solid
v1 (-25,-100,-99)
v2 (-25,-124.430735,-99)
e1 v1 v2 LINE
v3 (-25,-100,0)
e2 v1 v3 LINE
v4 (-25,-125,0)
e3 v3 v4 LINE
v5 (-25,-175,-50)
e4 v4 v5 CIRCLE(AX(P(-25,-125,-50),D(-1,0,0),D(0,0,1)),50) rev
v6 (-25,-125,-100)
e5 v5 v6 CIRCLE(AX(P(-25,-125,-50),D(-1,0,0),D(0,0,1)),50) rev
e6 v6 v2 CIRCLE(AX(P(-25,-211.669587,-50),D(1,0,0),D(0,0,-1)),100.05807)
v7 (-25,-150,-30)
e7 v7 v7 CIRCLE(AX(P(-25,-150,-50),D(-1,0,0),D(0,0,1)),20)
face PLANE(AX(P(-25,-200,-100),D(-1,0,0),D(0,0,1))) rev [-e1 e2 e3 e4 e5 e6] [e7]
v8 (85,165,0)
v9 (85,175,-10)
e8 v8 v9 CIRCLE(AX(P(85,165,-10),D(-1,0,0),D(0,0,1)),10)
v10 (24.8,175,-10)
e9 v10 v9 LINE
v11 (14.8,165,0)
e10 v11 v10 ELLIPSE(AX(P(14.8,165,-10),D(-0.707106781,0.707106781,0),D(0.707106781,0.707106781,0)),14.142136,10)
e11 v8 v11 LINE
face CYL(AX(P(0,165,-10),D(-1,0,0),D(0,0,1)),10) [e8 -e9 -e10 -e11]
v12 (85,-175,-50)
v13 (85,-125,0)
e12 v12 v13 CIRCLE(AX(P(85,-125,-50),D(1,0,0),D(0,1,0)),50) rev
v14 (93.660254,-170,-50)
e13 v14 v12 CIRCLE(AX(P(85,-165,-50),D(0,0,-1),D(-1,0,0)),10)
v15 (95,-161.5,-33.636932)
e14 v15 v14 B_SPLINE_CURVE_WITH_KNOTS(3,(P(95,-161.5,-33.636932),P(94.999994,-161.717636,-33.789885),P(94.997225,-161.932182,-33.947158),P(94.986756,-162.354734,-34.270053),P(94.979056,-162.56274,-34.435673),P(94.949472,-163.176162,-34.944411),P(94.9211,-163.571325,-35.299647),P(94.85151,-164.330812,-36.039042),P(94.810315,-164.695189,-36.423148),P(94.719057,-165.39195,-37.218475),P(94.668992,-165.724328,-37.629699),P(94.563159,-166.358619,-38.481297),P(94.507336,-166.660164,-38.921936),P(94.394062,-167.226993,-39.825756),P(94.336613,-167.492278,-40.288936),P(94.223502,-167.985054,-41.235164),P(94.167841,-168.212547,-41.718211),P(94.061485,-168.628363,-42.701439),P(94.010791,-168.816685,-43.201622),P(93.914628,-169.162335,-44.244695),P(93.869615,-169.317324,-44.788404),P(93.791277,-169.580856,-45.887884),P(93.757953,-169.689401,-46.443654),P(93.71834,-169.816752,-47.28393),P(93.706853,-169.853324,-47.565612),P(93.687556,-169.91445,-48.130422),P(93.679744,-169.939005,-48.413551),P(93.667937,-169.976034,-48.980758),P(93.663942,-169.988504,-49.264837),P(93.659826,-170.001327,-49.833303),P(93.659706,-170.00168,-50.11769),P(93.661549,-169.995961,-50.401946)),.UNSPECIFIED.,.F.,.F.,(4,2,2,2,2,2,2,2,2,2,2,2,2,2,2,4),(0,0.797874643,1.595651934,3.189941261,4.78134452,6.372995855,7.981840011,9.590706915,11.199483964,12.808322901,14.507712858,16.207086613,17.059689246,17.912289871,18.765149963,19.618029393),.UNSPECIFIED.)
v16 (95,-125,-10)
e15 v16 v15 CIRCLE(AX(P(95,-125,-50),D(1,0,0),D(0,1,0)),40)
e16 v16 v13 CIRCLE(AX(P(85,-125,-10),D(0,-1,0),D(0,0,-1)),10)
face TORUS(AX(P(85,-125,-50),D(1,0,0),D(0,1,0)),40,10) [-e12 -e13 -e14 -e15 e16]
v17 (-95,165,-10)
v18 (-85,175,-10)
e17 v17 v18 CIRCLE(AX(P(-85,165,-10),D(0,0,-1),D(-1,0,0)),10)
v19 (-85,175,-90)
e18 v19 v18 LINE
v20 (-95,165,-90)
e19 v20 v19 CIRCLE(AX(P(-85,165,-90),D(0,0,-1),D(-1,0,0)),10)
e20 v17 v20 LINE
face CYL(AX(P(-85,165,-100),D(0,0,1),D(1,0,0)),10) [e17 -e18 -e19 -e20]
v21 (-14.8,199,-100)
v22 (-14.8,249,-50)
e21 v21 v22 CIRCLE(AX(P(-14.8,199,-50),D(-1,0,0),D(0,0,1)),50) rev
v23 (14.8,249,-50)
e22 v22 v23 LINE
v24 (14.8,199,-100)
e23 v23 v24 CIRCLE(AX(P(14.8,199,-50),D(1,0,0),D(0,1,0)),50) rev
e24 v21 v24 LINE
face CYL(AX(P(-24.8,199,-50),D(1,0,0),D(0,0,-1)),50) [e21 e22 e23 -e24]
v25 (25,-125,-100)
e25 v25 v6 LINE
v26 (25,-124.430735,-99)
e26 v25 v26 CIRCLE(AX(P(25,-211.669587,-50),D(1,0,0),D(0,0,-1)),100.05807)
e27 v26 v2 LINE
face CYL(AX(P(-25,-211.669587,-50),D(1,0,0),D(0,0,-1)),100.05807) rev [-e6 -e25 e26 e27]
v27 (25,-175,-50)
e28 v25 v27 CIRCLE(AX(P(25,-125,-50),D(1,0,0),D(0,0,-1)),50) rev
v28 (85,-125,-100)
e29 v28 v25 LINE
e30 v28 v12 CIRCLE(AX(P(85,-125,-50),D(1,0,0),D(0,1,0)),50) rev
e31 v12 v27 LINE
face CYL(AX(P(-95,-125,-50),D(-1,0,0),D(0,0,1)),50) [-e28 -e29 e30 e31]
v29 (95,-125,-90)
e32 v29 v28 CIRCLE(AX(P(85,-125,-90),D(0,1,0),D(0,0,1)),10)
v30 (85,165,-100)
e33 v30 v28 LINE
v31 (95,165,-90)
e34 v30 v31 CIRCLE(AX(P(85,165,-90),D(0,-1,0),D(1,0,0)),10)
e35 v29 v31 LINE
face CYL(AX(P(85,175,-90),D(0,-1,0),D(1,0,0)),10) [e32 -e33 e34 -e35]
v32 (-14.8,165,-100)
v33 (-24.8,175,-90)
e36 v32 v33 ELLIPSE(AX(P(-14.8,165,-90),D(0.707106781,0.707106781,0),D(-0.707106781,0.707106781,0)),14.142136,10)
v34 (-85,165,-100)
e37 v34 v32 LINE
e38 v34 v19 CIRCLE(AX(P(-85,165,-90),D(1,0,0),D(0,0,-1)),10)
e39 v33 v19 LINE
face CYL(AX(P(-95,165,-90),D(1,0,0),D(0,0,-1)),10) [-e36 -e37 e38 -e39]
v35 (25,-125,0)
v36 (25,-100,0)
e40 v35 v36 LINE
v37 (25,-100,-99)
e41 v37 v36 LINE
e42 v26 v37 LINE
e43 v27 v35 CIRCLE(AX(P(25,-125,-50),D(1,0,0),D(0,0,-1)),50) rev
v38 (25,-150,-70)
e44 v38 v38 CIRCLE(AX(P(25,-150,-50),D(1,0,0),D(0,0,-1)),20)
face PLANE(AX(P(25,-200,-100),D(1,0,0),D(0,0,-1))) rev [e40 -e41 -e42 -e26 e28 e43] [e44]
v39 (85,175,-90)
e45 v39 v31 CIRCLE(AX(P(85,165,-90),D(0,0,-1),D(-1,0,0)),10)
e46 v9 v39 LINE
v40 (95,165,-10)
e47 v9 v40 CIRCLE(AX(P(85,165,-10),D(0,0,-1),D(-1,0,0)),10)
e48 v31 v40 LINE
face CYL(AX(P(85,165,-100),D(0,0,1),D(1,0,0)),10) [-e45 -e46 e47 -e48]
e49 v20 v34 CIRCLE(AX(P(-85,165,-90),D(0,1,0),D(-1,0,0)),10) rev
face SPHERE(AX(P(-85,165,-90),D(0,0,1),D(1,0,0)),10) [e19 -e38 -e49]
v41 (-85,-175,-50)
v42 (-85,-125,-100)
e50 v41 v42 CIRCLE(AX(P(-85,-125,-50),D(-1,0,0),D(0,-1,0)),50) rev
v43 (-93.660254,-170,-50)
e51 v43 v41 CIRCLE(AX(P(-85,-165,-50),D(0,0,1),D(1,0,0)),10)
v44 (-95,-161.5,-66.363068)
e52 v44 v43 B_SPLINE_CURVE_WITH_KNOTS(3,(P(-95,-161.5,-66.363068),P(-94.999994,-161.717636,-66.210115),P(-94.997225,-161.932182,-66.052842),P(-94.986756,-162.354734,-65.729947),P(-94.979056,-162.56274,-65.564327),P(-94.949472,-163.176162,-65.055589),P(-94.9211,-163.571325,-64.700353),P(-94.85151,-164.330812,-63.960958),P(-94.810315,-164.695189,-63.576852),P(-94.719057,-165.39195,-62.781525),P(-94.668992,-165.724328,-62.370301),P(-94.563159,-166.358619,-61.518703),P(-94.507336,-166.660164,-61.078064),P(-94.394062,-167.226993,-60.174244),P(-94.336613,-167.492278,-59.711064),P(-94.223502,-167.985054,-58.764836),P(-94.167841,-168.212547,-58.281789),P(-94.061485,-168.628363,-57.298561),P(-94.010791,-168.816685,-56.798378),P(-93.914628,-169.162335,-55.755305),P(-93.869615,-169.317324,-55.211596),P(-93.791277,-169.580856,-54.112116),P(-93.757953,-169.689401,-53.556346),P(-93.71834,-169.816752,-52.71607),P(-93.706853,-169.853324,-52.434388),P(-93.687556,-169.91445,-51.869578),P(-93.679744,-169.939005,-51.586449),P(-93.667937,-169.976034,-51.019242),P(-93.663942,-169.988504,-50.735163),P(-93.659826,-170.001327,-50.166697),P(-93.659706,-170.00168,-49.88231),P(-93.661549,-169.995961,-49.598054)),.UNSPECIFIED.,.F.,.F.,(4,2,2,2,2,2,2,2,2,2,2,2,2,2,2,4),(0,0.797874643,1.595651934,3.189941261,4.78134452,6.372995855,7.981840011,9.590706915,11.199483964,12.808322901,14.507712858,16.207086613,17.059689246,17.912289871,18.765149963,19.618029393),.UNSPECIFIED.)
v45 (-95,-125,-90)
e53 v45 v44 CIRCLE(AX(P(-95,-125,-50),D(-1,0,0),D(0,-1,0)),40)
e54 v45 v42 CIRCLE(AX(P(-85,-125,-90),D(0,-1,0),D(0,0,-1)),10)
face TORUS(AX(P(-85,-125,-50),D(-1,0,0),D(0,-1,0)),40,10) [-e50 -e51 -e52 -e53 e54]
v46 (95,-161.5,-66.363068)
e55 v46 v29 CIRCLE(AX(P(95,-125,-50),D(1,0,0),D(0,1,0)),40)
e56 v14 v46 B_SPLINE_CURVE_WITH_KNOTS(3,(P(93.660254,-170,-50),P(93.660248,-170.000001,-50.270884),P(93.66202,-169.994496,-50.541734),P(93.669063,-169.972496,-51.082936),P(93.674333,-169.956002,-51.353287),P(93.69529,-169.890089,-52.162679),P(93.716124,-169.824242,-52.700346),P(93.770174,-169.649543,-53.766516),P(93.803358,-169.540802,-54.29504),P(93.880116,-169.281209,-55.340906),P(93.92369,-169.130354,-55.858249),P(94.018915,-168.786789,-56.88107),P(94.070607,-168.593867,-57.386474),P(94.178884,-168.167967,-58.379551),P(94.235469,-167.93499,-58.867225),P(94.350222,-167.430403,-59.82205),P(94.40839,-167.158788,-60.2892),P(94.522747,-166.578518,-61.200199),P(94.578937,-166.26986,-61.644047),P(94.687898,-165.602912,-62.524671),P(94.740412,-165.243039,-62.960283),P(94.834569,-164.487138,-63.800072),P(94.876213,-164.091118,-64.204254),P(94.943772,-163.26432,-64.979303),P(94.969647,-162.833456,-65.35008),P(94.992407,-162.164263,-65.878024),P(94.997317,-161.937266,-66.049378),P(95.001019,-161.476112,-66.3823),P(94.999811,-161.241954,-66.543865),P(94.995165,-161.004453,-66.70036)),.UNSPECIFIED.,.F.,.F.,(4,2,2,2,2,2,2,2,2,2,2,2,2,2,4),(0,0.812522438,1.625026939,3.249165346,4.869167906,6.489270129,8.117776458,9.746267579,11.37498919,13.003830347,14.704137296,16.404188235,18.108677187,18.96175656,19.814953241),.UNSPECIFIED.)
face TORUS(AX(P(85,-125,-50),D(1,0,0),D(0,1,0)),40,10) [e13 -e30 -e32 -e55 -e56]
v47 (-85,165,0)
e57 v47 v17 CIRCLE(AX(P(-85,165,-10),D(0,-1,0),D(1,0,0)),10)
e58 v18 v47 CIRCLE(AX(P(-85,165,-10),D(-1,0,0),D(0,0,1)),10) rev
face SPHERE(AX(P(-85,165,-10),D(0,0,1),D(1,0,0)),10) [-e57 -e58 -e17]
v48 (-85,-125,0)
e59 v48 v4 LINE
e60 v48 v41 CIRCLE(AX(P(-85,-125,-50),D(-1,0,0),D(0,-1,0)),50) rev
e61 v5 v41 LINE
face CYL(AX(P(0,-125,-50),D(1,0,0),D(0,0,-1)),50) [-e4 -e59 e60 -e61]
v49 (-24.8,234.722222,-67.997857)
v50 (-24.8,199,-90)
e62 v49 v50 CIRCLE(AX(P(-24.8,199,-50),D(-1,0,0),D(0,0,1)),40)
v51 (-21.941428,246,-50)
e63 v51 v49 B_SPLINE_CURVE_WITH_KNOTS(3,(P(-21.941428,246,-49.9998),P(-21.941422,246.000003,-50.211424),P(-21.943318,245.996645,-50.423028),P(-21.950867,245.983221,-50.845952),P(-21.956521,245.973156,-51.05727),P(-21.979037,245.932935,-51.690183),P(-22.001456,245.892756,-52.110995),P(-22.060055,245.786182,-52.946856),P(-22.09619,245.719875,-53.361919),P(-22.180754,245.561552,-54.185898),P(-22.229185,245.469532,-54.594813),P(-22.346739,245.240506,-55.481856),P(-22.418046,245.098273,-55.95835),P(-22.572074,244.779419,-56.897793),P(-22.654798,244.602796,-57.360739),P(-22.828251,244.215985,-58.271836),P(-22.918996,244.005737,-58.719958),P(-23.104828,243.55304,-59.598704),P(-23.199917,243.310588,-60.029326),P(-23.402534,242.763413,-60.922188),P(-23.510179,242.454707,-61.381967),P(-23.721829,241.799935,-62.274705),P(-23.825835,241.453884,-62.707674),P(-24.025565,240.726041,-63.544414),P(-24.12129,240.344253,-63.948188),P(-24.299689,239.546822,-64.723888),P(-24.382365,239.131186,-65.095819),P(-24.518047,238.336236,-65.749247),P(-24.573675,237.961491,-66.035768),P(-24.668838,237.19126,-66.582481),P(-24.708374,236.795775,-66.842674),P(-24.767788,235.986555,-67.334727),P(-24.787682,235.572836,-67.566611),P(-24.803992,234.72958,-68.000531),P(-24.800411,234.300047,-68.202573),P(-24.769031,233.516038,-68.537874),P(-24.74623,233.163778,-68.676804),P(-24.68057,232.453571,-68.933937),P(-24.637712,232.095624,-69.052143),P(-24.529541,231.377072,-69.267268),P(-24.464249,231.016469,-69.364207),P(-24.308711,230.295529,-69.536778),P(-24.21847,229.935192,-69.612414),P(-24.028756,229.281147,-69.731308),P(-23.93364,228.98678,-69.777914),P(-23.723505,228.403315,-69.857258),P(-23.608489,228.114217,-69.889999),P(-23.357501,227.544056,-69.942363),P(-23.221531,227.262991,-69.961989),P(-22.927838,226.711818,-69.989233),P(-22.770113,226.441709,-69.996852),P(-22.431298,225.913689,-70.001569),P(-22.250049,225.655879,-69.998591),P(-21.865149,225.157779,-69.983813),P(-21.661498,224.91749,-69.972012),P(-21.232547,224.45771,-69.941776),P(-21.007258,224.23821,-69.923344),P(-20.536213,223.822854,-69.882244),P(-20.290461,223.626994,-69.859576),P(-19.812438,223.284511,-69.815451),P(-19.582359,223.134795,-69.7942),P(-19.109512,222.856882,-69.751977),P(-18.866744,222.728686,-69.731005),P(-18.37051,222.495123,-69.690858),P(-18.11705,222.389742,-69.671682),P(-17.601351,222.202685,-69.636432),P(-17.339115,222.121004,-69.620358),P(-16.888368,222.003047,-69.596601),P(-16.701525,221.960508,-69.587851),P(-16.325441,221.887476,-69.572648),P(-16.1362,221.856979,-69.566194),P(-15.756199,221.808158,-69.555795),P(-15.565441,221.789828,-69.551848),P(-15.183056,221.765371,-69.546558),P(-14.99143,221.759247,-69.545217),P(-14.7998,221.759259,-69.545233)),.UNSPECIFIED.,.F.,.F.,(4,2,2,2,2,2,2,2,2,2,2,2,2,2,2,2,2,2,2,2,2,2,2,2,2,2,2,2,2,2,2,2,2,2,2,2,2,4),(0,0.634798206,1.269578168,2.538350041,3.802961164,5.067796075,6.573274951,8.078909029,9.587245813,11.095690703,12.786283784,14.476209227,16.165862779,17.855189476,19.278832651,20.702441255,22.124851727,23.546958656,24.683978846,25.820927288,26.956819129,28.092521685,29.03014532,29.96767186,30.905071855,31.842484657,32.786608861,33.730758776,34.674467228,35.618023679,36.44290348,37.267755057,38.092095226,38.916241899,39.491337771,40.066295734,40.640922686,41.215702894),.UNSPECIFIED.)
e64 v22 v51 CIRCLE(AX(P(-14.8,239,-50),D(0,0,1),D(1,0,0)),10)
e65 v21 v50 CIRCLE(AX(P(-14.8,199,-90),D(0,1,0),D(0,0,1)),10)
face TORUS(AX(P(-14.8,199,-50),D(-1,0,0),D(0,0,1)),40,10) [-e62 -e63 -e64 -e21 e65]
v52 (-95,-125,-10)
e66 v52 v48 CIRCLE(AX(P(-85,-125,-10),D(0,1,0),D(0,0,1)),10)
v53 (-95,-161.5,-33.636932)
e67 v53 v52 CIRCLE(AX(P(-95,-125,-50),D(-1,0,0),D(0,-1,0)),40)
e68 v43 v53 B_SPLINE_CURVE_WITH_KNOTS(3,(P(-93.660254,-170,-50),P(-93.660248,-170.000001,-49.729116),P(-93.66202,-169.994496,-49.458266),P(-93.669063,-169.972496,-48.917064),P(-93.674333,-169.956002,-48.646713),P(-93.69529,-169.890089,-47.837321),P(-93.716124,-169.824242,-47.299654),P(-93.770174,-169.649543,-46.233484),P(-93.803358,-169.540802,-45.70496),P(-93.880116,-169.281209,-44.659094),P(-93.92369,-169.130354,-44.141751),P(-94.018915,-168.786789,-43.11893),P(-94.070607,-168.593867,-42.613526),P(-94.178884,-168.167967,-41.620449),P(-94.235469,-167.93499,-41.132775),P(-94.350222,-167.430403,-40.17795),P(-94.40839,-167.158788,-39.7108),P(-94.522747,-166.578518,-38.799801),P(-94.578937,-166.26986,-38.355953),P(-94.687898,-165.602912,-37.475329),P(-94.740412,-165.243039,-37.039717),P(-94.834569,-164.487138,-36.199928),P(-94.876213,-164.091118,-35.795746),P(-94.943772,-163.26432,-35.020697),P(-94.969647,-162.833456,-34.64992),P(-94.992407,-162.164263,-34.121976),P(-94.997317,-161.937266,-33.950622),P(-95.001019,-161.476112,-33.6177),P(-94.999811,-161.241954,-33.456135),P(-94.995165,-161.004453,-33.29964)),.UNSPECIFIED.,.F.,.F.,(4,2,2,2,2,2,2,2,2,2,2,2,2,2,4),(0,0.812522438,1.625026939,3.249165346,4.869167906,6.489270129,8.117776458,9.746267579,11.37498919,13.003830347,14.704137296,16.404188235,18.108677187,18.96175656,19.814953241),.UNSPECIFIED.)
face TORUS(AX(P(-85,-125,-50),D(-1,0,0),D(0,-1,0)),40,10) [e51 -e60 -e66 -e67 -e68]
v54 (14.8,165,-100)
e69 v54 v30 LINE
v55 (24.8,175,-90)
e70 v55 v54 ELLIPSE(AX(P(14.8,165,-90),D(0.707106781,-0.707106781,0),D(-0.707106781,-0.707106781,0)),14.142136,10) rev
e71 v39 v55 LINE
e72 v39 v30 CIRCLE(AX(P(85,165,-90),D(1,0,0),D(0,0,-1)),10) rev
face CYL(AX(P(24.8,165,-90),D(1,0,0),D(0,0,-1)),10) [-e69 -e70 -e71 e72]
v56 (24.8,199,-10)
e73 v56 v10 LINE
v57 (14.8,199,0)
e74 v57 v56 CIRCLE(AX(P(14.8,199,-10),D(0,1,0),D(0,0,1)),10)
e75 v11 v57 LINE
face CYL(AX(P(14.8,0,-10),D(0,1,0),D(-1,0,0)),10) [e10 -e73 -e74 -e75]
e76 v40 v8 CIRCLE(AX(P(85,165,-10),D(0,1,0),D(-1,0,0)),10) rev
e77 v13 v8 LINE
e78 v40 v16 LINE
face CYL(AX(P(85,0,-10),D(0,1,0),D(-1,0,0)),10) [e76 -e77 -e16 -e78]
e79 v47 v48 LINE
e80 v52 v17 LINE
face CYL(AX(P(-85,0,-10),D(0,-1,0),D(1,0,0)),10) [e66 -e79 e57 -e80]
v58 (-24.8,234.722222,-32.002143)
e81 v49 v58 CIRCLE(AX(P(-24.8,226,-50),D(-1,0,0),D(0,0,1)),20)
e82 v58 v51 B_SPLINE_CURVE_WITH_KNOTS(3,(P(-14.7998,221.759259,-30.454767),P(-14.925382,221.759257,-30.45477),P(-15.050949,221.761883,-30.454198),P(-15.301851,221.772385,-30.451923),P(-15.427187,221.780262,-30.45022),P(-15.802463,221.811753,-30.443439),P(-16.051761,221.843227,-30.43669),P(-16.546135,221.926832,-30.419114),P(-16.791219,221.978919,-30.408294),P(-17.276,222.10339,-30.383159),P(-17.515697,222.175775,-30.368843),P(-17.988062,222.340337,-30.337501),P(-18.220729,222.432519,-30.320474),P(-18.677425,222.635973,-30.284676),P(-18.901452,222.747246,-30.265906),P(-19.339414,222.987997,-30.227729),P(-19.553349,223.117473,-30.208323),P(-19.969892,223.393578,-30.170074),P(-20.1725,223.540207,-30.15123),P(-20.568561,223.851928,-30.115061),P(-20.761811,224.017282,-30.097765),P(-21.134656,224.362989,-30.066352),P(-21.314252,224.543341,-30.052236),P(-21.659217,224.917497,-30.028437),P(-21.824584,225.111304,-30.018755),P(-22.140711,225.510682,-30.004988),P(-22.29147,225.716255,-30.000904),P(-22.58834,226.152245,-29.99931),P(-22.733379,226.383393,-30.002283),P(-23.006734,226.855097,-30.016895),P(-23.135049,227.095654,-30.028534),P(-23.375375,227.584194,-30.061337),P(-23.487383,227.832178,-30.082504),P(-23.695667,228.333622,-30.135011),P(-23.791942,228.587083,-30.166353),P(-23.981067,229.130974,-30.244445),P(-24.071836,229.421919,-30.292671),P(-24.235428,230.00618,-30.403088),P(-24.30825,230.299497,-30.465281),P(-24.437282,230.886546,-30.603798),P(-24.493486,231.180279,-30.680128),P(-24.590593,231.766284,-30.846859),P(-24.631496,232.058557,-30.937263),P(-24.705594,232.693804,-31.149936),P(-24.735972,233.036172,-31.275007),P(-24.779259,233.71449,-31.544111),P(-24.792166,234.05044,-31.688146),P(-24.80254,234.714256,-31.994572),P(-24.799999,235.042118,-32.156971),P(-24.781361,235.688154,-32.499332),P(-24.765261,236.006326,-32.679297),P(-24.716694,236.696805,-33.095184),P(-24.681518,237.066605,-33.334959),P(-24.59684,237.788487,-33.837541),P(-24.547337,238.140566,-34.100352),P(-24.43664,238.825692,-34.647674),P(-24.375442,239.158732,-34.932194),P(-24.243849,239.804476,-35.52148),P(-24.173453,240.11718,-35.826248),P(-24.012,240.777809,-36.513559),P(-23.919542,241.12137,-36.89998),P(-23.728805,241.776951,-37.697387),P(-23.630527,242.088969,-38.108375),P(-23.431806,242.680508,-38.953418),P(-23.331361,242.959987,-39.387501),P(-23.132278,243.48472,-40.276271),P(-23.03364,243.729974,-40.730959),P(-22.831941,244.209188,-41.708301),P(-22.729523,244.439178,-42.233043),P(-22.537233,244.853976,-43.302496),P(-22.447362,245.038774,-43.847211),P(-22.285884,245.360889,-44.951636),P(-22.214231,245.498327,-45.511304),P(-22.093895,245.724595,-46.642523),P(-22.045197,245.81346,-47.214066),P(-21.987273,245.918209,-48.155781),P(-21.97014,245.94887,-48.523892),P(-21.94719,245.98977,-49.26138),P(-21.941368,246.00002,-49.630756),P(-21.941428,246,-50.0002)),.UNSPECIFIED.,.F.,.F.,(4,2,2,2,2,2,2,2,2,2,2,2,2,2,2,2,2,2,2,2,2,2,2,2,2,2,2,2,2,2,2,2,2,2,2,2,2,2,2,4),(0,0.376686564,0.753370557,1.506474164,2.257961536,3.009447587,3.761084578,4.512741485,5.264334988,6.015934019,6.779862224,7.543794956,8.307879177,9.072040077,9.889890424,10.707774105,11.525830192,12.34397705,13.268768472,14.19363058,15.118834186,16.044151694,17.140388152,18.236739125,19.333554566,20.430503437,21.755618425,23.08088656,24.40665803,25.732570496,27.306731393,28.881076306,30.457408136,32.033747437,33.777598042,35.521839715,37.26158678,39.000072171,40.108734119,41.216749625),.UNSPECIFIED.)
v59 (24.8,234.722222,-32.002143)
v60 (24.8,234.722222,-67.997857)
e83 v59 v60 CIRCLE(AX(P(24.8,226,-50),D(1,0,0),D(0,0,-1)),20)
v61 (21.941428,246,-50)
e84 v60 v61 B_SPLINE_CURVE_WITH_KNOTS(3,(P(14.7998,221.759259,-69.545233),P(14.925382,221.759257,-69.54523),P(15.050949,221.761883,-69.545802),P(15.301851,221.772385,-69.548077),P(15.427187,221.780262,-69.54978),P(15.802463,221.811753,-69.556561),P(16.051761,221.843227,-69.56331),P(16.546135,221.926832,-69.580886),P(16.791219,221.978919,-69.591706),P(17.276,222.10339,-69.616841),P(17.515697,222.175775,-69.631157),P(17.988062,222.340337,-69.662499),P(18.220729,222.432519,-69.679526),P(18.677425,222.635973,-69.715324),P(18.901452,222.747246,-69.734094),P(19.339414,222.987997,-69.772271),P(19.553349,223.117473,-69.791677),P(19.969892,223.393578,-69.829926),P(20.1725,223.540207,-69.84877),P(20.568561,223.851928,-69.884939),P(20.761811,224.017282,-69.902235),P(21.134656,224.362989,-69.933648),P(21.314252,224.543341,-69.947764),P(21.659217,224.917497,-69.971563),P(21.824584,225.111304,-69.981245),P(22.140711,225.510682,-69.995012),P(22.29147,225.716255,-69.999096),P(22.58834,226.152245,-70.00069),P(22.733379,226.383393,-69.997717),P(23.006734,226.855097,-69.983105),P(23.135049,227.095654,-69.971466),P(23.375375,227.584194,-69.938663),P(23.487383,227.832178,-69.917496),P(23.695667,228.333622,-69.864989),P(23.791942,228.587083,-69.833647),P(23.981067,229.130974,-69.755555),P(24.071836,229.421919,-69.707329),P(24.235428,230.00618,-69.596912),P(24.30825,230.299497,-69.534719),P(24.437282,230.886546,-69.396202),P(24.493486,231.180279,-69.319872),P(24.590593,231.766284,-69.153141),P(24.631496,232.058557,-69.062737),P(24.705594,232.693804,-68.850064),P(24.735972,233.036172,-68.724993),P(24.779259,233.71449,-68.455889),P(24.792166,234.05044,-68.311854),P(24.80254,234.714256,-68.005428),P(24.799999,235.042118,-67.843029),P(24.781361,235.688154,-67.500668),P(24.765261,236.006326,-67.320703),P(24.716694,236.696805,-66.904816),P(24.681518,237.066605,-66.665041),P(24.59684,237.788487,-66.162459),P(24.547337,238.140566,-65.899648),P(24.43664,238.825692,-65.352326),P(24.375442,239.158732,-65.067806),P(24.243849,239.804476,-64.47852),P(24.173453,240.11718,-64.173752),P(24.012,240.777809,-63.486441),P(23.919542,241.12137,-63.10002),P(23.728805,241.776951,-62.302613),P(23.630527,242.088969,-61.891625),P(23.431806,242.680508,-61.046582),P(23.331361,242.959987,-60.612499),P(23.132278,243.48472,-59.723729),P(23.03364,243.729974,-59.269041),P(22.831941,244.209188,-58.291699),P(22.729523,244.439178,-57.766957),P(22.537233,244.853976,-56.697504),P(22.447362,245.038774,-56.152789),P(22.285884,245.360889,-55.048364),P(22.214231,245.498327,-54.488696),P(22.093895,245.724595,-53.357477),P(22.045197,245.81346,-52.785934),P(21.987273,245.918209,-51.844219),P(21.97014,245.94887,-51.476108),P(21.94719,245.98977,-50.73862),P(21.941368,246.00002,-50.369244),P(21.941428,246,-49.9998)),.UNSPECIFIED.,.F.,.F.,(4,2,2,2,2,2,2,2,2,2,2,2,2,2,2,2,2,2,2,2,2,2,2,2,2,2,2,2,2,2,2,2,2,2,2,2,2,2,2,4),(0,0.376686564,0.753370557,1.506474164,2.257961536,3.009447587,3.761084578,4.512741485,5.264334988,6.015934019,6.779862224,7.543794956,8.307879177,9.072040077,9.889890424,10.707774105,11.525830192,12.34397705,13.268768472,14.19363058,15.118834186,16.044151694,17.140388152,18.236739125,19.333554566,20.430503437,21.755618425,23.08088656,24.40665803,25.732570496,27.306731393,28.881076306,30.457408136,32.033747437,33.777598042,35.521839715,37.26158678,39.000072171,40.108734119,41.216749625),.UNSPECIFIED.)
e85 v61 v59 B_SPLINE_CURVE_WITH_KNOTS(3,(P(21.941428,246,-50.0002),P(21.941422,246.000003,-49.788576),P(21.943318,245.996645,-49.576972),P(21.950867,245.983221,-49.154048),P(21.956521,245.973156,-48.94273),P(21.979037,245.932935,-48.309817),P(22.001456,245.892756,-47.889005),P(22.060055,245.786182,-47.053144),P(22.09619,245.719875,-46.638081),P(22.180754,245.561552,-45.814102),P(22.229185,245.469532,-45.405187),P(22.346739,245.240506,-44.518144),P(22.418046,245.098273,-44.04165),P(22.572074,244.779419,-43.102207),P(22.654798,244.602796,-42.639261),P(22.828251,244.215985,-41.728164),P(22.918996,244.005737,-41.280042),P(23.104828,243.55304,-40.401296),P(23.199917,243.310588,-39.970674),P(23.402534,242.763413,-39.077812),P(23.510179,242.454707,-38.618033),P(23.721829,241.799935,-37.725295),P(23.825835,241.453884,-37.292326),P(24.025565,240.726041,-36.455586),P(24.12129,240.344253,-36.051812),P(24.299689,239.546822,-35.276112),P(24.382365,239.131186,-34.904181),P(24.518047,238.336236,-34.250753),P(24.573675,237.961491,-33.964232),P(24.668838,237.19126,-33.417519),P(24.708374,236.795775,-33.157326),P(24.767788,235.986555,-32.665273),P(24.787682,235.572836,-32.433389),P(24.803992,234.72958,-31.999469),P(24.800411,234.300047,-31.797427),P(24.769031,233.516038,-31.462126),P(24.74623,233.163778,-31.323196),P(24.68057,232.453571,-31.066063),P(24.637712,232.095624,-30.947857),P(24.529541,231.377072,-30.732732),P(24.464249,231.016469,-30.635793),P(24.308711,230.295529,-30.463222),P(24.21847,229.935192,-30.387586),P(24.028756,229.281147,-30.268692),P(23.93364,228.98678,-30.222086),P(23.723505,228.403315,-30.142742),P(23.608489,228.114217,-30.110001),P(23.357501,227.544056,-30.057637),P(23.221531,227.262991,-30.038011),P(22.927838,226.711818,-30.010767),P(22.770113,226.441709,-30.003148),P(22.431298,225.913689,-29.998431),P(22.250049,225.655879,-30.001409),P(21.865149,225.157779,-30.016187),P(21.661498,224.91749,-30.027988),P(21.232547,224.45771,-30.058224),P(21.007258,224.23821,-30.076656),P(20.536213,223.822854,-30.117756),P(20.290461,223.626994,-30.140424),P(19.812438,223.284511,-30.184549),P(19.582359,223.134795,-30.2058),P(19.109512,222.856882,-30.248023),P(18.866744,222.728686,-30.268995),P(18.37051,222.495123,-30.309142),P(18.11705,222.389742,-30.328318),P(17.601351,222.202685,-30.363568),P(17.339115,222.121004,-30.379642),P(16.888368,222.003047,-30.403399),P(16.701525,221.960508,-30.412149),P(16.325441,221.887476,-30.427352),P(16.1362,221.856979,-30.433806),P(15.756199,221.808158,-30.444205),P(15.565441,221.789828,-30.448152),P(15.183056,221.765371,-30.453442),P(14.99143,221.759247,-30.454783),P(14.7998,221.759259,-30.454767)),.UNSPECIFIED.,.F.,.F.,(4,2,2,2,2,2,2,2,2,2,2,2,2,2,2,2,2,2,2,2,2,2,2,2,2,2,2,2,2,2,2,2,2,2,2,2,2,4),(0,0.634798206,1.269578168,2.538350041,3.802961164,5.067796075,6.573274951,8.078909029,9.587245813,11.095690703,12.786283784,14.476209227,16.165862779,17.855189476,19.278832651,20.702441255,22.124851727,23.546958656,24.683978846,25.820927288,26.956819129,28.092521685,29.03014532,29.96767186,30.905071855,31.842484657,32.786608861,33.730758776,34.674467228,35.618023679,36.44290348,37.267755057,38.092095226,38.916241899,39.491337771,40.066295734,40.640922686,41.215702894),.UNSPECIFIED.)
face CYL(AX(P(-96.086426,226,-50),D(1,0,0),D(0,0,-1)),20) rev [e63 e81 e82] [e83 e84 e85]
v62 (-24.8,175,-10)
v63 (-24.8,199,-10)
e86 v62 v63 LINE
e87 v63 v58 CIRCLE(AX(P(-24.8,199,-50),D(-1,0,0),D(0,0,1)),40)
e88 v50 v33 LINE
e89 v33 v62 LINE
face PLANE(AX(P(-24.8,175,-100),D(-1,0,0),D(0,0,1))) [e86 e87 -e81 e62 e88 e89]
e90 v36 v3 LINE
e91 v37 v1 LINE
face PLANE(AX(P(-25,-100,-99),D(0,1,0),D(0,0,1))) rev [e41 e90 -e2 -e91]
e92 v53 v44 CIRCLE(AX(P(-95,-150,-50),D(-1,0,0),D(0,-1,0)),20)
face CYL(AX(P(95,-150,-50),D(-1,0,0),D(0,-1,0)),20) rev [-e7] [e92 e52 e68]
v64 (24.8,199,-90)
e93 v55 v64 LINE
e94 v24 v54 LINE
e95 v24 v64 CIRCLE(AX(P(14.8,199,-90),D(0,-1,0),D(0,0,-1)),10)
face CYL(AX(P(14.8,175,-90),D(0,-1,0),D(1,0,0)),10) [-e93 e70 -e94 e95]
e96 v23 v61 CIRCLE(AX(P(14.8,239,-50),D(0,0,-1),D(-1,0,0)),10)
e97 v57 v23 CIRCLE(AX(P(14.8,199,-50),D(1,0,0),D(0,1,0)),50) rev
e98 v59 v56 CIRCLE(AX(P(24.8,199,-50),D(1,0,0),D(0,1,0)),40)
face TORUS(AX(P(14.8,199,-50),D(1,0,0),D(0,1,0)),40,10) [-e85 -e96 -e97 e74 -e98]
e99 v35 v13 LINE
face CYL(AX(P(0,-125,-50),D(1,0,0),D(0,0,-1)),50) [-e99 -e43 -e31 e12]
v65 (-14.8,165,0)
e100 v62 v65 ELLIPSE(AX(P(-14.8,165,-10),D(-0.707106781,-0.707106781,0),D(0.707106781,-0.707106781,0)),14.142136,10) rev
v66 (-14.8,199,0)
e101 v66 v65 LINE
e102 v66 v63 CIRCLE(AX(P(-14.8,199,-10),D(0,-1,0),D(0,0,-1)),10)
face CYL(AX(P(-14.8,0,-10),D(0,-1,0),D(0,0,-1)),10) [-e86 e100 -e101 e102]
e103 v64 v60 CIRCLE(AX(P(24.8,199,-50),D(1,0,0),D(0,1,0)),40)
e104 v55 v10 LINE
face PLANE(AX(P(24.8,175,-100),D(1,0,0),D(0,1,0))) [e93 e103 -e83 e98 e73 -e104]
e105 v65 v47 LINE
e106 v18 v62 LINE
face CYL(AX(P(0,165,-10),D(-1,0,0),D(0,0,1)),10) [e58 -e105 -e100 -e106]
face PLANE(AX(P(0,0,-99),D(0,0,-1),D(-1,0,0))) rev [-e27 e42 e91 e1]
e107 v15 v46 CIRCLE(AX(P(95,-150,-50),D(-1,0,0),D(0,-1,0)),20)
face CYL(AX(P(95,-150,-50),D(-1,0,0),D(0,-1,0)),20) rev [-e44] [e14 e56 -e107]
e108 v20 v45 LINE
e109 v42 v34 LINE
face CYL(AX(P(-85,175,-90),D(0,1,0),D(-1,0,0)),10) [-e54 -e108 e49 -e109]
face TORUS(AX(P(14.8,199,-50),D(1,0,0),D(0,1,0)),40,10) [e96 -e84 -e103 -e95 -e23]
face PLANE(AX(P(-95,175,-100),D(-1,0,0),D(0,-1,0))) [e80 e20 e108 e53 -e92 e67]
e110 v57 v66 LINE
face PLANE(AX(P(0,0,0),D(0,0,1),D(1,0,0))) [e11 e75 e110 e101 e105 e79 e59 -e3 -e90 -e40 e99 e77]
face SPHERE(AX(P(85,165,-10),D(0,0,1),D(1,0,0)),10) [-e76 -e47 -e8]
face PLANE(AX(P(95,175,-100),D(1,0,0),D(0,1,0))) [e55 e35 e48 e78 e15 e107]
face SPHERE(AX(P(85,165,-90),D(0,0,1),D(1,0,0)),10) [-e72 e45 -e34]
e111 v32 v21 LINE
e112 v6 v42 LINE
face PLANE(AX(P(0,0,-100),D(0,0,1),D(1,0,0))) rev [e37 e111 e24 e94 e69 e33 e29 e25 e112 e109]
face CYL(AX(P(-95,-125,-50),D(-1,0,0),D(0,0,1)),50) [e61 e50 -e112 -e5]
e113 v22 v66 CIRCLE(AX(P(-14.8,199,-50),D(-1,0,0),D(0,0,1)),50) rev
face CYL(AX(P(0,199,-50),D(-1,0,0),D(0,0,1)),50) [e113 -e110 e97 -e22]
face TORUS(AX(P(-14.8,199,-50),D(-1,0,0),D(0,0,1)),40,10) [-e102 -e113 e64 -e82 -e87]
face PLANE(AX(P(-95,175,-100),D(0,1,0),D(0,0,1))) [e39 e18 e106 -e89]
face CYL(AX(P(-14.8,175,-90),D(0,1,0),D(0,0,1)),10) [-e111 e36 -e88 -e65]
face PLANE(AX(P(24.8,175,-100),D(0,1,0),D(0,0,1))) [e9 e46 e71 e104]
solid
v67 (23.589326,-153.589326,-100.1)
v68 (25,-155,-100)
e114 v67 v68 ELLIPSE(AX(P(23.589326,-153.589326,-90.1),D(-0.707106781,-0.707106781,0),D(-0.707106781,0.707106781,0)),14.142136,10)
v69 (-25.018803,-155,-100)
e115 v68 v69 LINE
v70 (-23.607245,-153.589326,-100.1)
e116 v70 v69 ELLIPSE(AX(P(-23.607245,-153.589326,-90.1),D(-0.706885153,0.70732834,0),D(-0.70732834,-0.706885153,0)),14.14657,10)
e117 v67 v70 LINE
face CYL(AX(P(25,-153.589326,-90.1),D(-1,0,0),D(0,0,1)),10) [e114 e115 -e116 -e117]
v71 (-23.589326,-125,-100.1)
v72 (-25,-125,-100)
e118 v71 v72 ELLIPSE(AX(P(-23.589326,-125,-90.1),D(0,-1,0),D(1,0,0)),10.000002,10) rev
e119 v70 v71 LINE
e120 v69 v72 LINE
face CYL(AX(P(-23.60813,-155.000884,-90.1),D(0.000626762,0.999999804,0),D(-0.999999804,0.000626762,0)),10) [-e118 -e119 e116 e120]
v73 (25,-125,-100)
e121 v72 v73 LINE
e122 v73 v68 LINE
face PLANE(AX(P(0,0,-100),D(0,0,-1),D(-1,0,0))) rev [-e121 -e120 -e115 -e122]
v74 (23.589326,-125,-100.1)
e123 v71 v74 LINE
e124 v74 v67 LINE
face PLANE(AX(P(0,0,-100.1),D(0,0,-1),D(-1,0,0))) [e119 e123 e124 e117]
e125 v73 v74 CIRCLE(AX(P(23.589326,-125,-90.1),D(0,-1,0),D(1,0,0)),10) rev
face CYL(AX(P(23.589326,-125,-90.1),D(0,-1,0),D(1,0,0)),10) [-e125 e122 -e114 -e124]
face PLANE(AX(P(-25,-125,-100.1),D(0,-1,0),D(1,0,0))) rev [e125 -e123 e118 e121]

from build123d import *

# Parameters (mm, degrees)
BOSS_EXTRUDE1_DEPTH = 100
SKETCH2_W           = 50
SKETCH2_H           = 50
CUT_EXTRUDE1_DEPTH  = 285.650663094
FILLET1_R           = 50
CUT_EXTRUDE2_DEPTH  = 25
SKETCH7_R           = 20
CUT_EXTRUDE3_DEPTH  = 329.7871652
FILLET2_R           = 50
SKETCH9_W           = 50
SKETCH9_H           = 12.5
CUT_EXTRUDE6_DEPTH  = 285.650663094
CUT_EXTRUDE7_DEPTH  = 25
FILLET3_R           = 10
SKETCH11_W          = 50
SKETCH11_H          = 25
CUT_EXTRUDE8_DEPTH  = 99
BOSS_EXTRUDE7_DEPTH = 0.1
FILLET4_R           = 10
FILLET5_R           = 10
SKETCH14_R          = 20
CUT_EXTRUDE9_DEPTH  = 294.892922803


# Some blends are built 0.0001 mm under size
with BuildPart() as part:
    # Sketch1 → Boss-Extrude1 (new body)
    with BuildSketch(Plane.XY):
        Polygon((-24.8, 175), (-24.8, 249), (24.8, 249), (24.8, 175), (95, 175), (95, -175), (-95, -175), (-95, 175), align=None)
    extrude(amount=-BOSS_EXTRUDE1_DEPTH)

    # Sketch2 → Cut-Extrude1 (cut, through all)
    with BuildSketch(Plane.XY):
        with Locations((0, -175)):
            Rectangle(SKETCH2_W, SKETCH2_H)
    extrude(amount=-CUT_EXTRUDE1_DEPTH, mode=Mode.SUBTRACT)

    # Fillet1
    fillet1_edges = [part.edges().sort_by_distance(p)[0] for p in [
        (0, 249, -100),
        (0, 249, 0),
    ]]
    fillet(fillet1_edges, radius=FILLET1_R - 0.0001)  # a hair under: the kernel refuses the full size

    # Sketch6 → Cut-Extrude2 (cut, symmetric)
    with BuildSketch(Plane(origin=(0, 0, 0), x_dir=(0, 0, -1), z_dir=(1, 0, 0))):
        with BuildLine():
            Line((100, -150), (0, -150))
            ThreePointArc((0, -150), (50, -100), (100, -150))
        make_face()
    extrude(amount=CUT_EXTRUDE2_DEPTH, both=True, mode=Mode.SUBTRACT)

    # Sketch7 → Cut-Extrude3 (cut, through all)
    with BuildSketch(Plane.ZY.offset(95)):
        with Locations(Location((-50, -150, 0), (0, 0, 270))):
            Circle(SKETCH7_R)
    extrude(amount=-CUT_EXTRUDE3_DEPTH, mode=Mode.SUBTRACT)

    # Fillet2
    # the kernel refuses this fillet: 50 mm, written as the material it takes off along each edge
    with BuildSketch(Plane(origin=(100, -175, -100), x_dir=(0, 1, 0), z_dir=(-1, 0, 0))) as fillet2_piece_1:
        with BuildLine():
            CenterArc((FILLET2_R, -FILLET2_R), FILLET2_R, 90, 90)
            Line((0, -FILLET2_R), (0, 0))
            Line((0, 0), (FILLET2_R, 0))
        make_face()
    extrude(amount=320, mode=Mode.SUBTRACT)
    with BuildSketch(Plane(origin=(100, -175, 0), x_dir=(0, 1, 0), z_dir=(-1, 0, 0))) as fillet2_piece_2:
        with BuildLine():
            CenterArc((FILLET2_R, FILLET2_R), FILLET2_R, 180, 90)
            Line((0, FILLET2_R), (0, 0))
            Line((0, 0), (FILLET2_R, 0))
        make_face()
    extrude(amount=320, mode=Mode.SUBTRACT)

    # Sketch9 → Cut-Extrude6 (cut, through all)
    with BuildSketch(Plane.XY):
        with Locations((0, -131.25)):
            Rectangle(SKETCH9_W, SKETCH9_H)
    extrude(amount=-CUT_EXTRUDE6_DEPTH, mode=Mode.SUBTRACT)

    # Sketch10 → Cut-Extrude7 (cut, symmetric)
    with BuildSketch(Plane(origin=(0, 0, 0), x_dir=(0, 0, -1), z_dir=(1, 0, 0))):
        with BuildLine():
            Line((0, -125), (100, -125))
            ThreePointArc((100, -125), (50, -111.611517322), (0, -125))
        make_face()
    extrude(amount=CUT_EXTRUDE7_DEPTH, both=True, mode=Mode.SUBTRACT)

    # Fillet3
    # the kernel refuses this fillet: 10 mm, written as the material it takes off along each edge
    with BuildSketch(Plane(origin=(24.8, 199.0001, -100), x_dir=(-1, 0, 0), z_dir=(0, -1, 0)), Plane(origin=(-24.8, 175, 0), x_dir=(0, 0, -1), z_dir=(0, 1, 0))) as fillet3_piece_1:
        with BuildLine():
            CenterArc((FILLET3_R, -FILLET3_R), FILLET3_R, 90, 90)
            Line((0, -FILLET3_R), (0, 0))
            Line((0, 0), (FILLET3_R, 0))
        make_face()
    extrude(amount=24.0001, mode=Mode.SUBTRACT)
    with BuildSketch(Plane(origin=(24.8, 175, 0), x_dir=(0, -1, 0), z_dir=(1, 0, 0)), Plane(origin=(-120, 175, 0), x_dir=(0, -1, 0), z_dir=(1, 0, 0))) as fillet3_piece_2:
        with BuildLine():
            CenterArc((FILLET3_R, FILLET3_R), FILLET3_R, 180, 90)
            Line((0, FILLET3_R), (0, 0))
            Line((0, 0), (FILLET3_R, 0))
        make_face()
    extrude(amount=95.2, mode=Mode.SUBTRACT)
    with BuildSketch(Plane(origin=(-120, 175, -100), x_dir=(0, -1, 0), z_dir=(1, 0, 0)), Plane(origin=(24.8, 175, -100), x_dir=(0, -1, 0), z_dir=(1, 0, 0))) as fillet3_piece_3:
        with BuildLine():
            CenterArc((FILLET3_R, -FILLET3_R), FILLET3_R, 90, 90)
            Line((0, -FILLET3_R), (0, 0))
            Line((0, 0), (FILLET3_R, 0))
        make_face()
    extrude(amount=95.2, mode=Mode.SUBTRACT)
    with BuildSketch(Plane(origin=(-95, -125, -100), x_dir=(1, 0, 0), z_dir=(0, 1, 0)), Plane(origin=(95, 200, -100), x_dir=(-1, 0, 0), z_dir=(0, -1, 0))) as fillet3_piece_4:
        with BuildLine():
            CenterArc((FILLET3_R, -FILLET3_R), FILLET3_R, 90, 90)
            Line((0, -FILLET3_R), (0, 0))
            Line((0, 0), (FILLET3_R, 0))
        make_face()
    extrude(amount=325, mode=Mode.SUBTRACT)
    with BuildSketch(Plane(origin=(-24.8, 175, -100), x_dir=(0, 0, 1), z_dir=(0, 1, 0)), Plane(origin=(24.8, 199.0001, 0), x_dir=(-1, 0, 0), z_dir=(0, -1, 0))) as fillet3_piece_5:
        with BuildLine():
            CenterArc((FILLET3_R, FILLET3_R), FILLET3_R, 180, 90)
            Line((0, FILLET3_R), (0, 0))
            Line((0, 0), (FILLET3_R, 0))
        make_face()
    extrude(amount=24.0001, mode=Mode.SUBTRACT)
    with BuildSketch(Plane(origin=(-24.8, 199.0001, -49.9999), x_dir=(0, 1, 0), z_dir=(0, 0, -1))) as fillet3_piece_6:
        with BuildLine():
            CenterArc((49.9999 - FILLET3_R, FILLET3_R), FILLET3_R, 270, 90)
            Line((49.9999, FILLET3_R), (49.9999, 0))
            Line((49.9999, 0), (49.9999 - FILLET3_R, 0))
        make_face()
    revolve(axis=Axis((-24.8, 199.0001, -49.9999), (1, 0, 0)), revolution_arc=90, mode=Mode.SUBTRACT)
    with BuildSketch(Plane(origin=(-24.8, 199.0001, -50.0001), x_dir=(0, 1, 0), z_dir=(0, 0, 1))) as fillet3_piece_7:
        with BuildLine():
            CenterArc((49.9999 - FILLET3_R, -FILLET3_R), FILLET3_R, 0, 90)
            Line((49.9999, -FILLET3_R), (49.9999, 0))
            Line((49.9999, 0), (49.9999 - FILLET3_R, 0))
        make_face()
    revolve(axis=Axis((-24.8, 199.0001, -50.0001), (-1, 0, 0)), revolution_arc=90, mode=Mode.SUBTRACT)
    with BuildSketch(Plane(origin=(24.8, 199.0001, -49.9999), x_dir=(0, 1, 0), z_dir=(0, 0, -1))) as fillet3_piece_8:
        with BuildLine():
            CenterArc((49.9999 - FILLET3_R, -FILLET3_R), FILLET3_R, 0, 90)
            Line((49.9999 - FILLET3_R, 0), (49.9999, 0))
            Line((49.9999, 0), (49.9999, -FILLET3_R))
        make_face()
    revolve(axis=Axis((24.8, 199.0001, -49.9999), (1, 0, 0)), revolution_arc=90, mode=Mode.SUBTRACT)
    with BuildSketch(Plane(origin=(24.8, 199.0001, -50.0001), x_dir=(0, 1, 0), z_dir=(0, 0, 1))) as fillet3_piece_9:
        with BuildLine():
            CenterArc((49.9999 - FILLET3_R, FILLET3_R), FILLET3_R, 270, 90)
            Line((49.9999 - FILLET3_R, 0), (49.9999, 0))
            Line((49.9999, 0), (49.9999, FILLET3_R))
        make_face()
    revolve(axis=Axis((24.8, 199.0001, -50.0001), (-1, 0, 0)), revolution_arc=90, mode=Mode.SUBTRACT)
    with BuildSketch(Plane(origin=(95, 200, 0), x_dir=(-1, 0, 0), z_dir=(0, -1, 0)), Plane(origin=(-95, -125, 0), x_dir=(1, 0, 0), z_dir=(0, 1, 0))) as fillet3_piece_10:
        with BuildLine():
            CenterArc((FILLET3_R, FILLET3_R), FILLET3_R, 180, 90)
            Line((0, FILLET3_R), (0, 0))
            Line((0, 0), (FILLET3_R, 0))
        make_face()
    extrude(amount=325, mode=Mode.SUBTRACT)
    with BuildSketch(Plane(origin=(95, -125, -50), x_dir=(0, 0, -1), z_dir=(0, 1, 0))) as fillet3_piece_11:
        with BuildLine():
            CenterArc((50 - FILLET3_R, FILLET3_R), FILLET3_R, 270, 90)
            Line((50 - FILLET3_R, 0), (50, 0))
            Line((50, 0), (50, FILLET3_R))
        make_face()
    revolve(axis=Axis((95, -125, -50), (-1, 0, 0)), revolution_arc=180, mode=Mode.SUBTRACT)
    with BuildSketch(Plane(origin=(-95, -125, -50), x_dir=(0, 0, -1), z_dir=(0, 1, 0))) as fillet3_piece_12:
        with BuildLine():
            CenterArc((50 - FILLET3_R, -FILLET3_R), FILLET3_R, 0, 90)
            Line((50, -FILLET3_R), (50, 0))
            Line((50, 0), (50 - FILLET3_R, 0))
        make_face()
    revolve(axis=Axis((-95, -125, -50), (-1, 0, 0)), revolution_arc=180, mode=Mode.SUBTRACT)
    with BuildSketch(Plane(origin=(24.8, 249, -49.9999), x_dir=(-1, 0, 0), z_dir=(0, 0, -1)), Plane(origin=(-24.8, 249, -49.9999), x_dir=(0, -1, 0), z_dir=(0, 0, -1))) as fillet3_piece_13:
        with BuildLine():
            CenterArc((FILLET3_R, -FILLET3_R), FILLET3_R, 90, 90)
            Line((0, -FILLET3_R), (0, 0))
            Line((0, 0), (FILLET3_R, 0))
        make_face()
    extrude(amount=0.0002, mode=Mode.SUBTRACT)
    with BuildSketch(Plane(origin=(-0.2, 175, -100), x_dir=(0, -1, 0), z_dir=(1, 0, 0))) as fillet3_piece_14a_section:
        with BuildLine():
            CenterArc((FILLET3_R, -FILLET3_R), FILLET3_R, 90, 90)
            Line((0, -FILLET3_R), (0, 0))
            Line((0, 0), (FILLET3_R, 0))
        make_face()
    fillet3_piece_14a = extrude(amount=120.2, mode=Mode.PRIVATE)
    fillet3_piece_14a = split(fillet3_piece_14a, bisect_by=Plane(origin=(24.8, 172.736048857, -97.736048857), z_dir=(-1, 0, 0)), keep=Keep.TOP, mode=Mode.PRIVATE)
    with BuildSketch(Plane(origin=(24.8, 199.0001, -100), x_dir=(-1, 0, 0), z_dir=(0, -1, 0))) as fillet3_piece_14b_section:
        with BuildLine():
            CenterArc((FILLET3_R, -FILLET3_R), FILLET3_R, 90, 90)
            Line((0, -FILLET3_R), (0, 0))
            Line((0, 0), (FILLET3_R, 0))
        make_face()
    fillet3_piece_14b = extrude(amount=49.0001, mode=Mode.PRIVATE)
    fillet3_piece_14b = split(fillet3_piece_14b, bisect_by=Plane(origin=(22.536048857, 175, -97.736048857), z_dir=(0, -1, 0)), keep=Keep.TOP, mode=Mode.PRIVATE)
    fillet3_piece_14 = fillet3_piece_14a & fillet3_piece_14b
    add(fillet3_piece_14, mode=Mode.SUBTRACT)
    with BuildSketch(Plane(origin=(-0.2, 175, 0), x_dir=(0, -1, 0), z_dir=(1, 0, 0))) as fillet3_piece_15a_section:
        with BuildLine():
            CenterArc((FILLET3_R, FILLET3_R), FILLET3_R, 180, 90)
            Line((0, FILLET3_R), (0, 0))
            Line((0, 0), (FILLET3_R, 0))
        make_face()
    fillet3_piece_15a = extrude(amount=120.2, mode=Mode.PRIVATE)
    fillet3_piece_15a = split(fillet3_piece_15a, bisect_by=Plane(origin=(24.8, 172.736048857, -2.263951143), z_dir=(-1, 0, 0)), keep=Keep.TOP, mode=Mode.PRIVATE)
    with BuildSketch(Plane(origin=(24.8, 199.0001, 0), x_dir=(-1, 0, 0), z_dir=(0, -1, 0))) as fillet3_piece_15b_section:
        with BuildLine():
            CenterArc((FILLET3_R, FILLET3_R), FILLET3_R, 180, 90)
            Line((0, FILLET3_R), (0, 0))
            Line((0, 0), (FILLET3_R, 0))
        make_face()
    fillet3_piece_15b = extrude(amount=49.0001, mode=Mode.PRIVATE)
    fillet3_piece_15b = split(fillet3_piece_15b, bisect_by=Plane(origin=(22.536048857, 175, -2.263951143), z_dir=(0, -1, 0)), keep=Keep.TOP, mode=Mode.PRIVATE)
    fillet3_piece_15 = fillet3_piece_15a & fillet3_piece_15b
    add(fillet3_piece_15, mode=Mode.SUBTRACT)
    with BuildSketch(Plane(origin=(-24.8, 150, -100), x_dir=(0, 0, 1), z_dir=(0, 1, 0))) as fillet3_piece_16a_section:
        with BuildLine():
            CenterArc((FILLET3_R, FILLET3_R), FILLET3_R, 180, 90)
            Line((0, FILLET3_R), (0, 0))
            Line((0, 0), (FILLET3_R, 0))
        make_face()
    fillet3_piece_16a = extrude(amount=49.0001, mode=Mode.PRIVATE)
    fillet3_piece_16a = split(fillet3_piece_16a, bisect_by=Plane(origin=(-22.536048857, 175, -97.736048857), z_dir=(0, -1, 0)), keep=Keep.TOP, mode=Mode.PRIVATE)
    with BuildSketch(Plane(origin=(-120, 175, -100), x_dir=(0, -1, 0), z_dir=(1, 0, 0))) as fillet3_piece_16b_section:
        with BuildLine():
            CenterArc((FILLET3_R, -FILLET3_R), FILLET3_R, 90, 90)
            Line((0, -FILLET3_R), (0, 0))
            Line((0, 0), (FILLET3_R, 0))
        make_face()
    fillet3_piece_16b = extrude(amount=120.2, mode=Mode.PRIVATE)
    fillet3_piece_16b = split(fillet3_piece_16b, bisect_by=Plane(origin=(-24.8, 172.736048857, -97.736048857), z_dir=(1, 0, 0)), keep=Keep.TOP, mode=Mode.PRIVATE)
    fillet3_piece_16 = fillet3_piece_16a & fillet3_piece_16b
    add(fillet3_piece_16, mode=Mode.SUBTRACT)
    with BuildSketch(Plane(origin=(-24.8, 150, 0), x_dir=(0, 0, -1), z_dir=(0, 1, 0))) as fillet3_piece_17a_section:
        with BuildLine():
            CenterArc((FILLET3_R, -FILLET3_R), FILLET3_R, 90, 90)
            Line((0, -FILLET3_R), (0, 0))
            Line((0, 0), (FILLET3_R, 0))
        make_face()
    fillet3_piece_17a = extrude(amount=49.0001, mode=Mode.PRIVATE)
    fillet3_piece_17a = split(fillet3_piece_17a, bisect_by=Plane(origin=(-22.536048857, 175, -2.263951143), z_dir=(0, -1, 0)), keep=Keep.TOP, mode=Mode.PRIVATE)
    with BuildSketch(Plane(origin=(-120, 175, 0), x_dir=(0, -1, 0), z_dir=(1, 0, 0))) as fillet3_piece_17b_section:
        with BuildLine():
            CenterArc((FILLET3_R, FILLET3_R), FILLET3_R, 180, 90)
            Line((0, FILLET3_R), (0, 0))
            Line((0, 0), (FILLET3_R, 0))
        make_face()
    fillet3_piece_17b = extrude(amount=120.2, mode=Mode.PRIVATE)
    fillet3_piece_17b = split(fillet3_piece_17b, bisect_by=Plane(origin=(-24.8, 172.736048857, -2.263951143), z_dir=(1, 0, 0)), keep=Keep.TOP, mode=Mode.PRIVATE)
    fillet3_piece_17 = fillet3_piece_17a & fillet3_piece_17b
    add(fillet3_piece_17, mode=Mode.SUBTRACT)

    # Sketch11 → Cut-Extrude8 (cut)
    with BuildSketch(Plane.XY):
        with Locations((0, -112.5)):
            Rectangle(SKETCH11_W, SKETCH11_H)
    extrude(amount=-CUT_EXTRUDE8_DEPTH, mode=Mode.SUBTRACT)

    # Fillet5
    # the kernel refuses this fillet: 10 mm, written as the material it takes off along each edge
    with BuildSketch(Plane(origin=(85, 165, -10), x_dir=(0, 1, 0), z_dir=(1, 0, 0))) as fillet5_piece_1_section:
        Polygon((0, 0), (FILLET5_R, 0), (FILLET5_R, FILLET5_R), (0, FILLET5_R), align=None)
    fillet5_piece_1 = extrude(amount=FILLET5_R, mode=Mode.PRIVATE)
    fillet5_piece_1 = fillet5_piece_1 - Plane(origin=(85, 165, -10), x_dir=(0, -0.7071067811865475, -0.7071067811865475), z_dir=(1, 0, 0)) * Sphere(FILLET5_R, mode=Mode.PRIVATE)
    add(fillet5_piece_1, mode=Mode.SUBTRACT)
    with BuildSketch(Plane(origin=(85, 165, -90), x_dir=(0, 1, 0), z_dir=(1, 0, 0))) as fillet5_piece_2_section:
        Polygon((0, 0), (FILLET5_R, 0), (FILLET5_R, -FILLET5_R), (0, -FILLET5_R), align=None)
    fillet5_piece_2 = extrude(amount=FILLET5_R, mode=Mode.PRIVATE)
    fillet5_piece_2 = fillet5_piece_2 - Plane(origin=(85, 165, -90), x_dir=(0, -0.7071067811865475, 0.7071067811865475), z_dir=(1, 0, 0)) * Sphere(FILLET5_R, mode=Mode.PRIVATE)
    add(fillet5_piece_2, mode=Mode.SUBTRACT)
    with BuildSketch(Plane(origin=(-85, 165, -90), x_dir=(0, 1, 0), z_dir=(-1, 0, 0))) as fillet5_piece_3_section:
        Polygon((0, 0), (FILLET5_R, 0), (FILLET5_R, FILLET5_R), (0, FILLET5_R), align=None)
    fillet5_piece_3 = extrude(amount=FILLET5_R, mode=Mode.PRIVATE)
    fillet5_piece_3 = fillet5_piece_3 - Plane(origin=(-85, 165, -90), x_dir=(0, -0.7071067811865475, 0.7071067811865475), z_dir=(-1, 0, 0)) * Sphere(FILLET5_R, mode=Mode.PRIVATE)
    add(fillet5_piece_3, mode=Mode.SUBTRACT)
    with BuildSketch(Plane(origin=(-85, 165, -10), x_dir=(0, 1, 0), z_dir=(-1, 0, 0))) as fillet5_piece_4_section:
        Polygon((0, 0), (FILLET5_R, 0), (FILLET5_R, -FILLET5_R), (0, -FILLET5_R), align=None)
    fillet5_piece_4 = extrude(amount=FILLET5_R, mode=Mode.PRIVATE)
    fillet5_piece_4 = fillet5_piece_4 - Plane(origin=(-85, 165, -10), x_dir=(0, -0.7071067811865475, -0.7071067811865475), z_dir=(-1, 0, 0)) * Sphere(FILLET5_R, mode=Mode.PRIVATE)
    add(fillet5_piece_4, mode=Mode.SUBTRACT)
    with BuildSketch(Plane(origin=(95, 175, -10), x_dir=(0, -1, 0), z_dir=(0, 0, -1))) as fillet5_piece_5:
        with BuildLine():
            CenterArc((FILLET5_R, FILLET5_R), FILLET5_R, 180, 90)
            Line((0, FILLET5_R), (0, 0))
            Line((0, 0), (FILLET5_R, 0))
        make_face()
    extrude(amount=80, mode=Mode.SUBTRACT)
    with BuildSketch(Plane(origin=(-95, 175, -10), x_dir=(0, -1, 0), z_dir=(0, 0, -1))) as fillet5_piece_6:
        with BuildLine():
            CenterArc((FILLET5_R, -FILLET5_R), FILLET5_R, 90, 90)
            Line((0, -FILLET5_R), (0, 0))
            Line((0, 0), (FILLET5_R, 0))
        make_face()
    extrude(amount=80, mode=Mode.SUBTRACT)

    # Sketch14 → Cut-Extrude9 (cut, through all)
    with BuildSketch(Plane(origin=(24.8, 0, 0), x_dir=(0, 0, -1), z_dir=(1, 0, 0))):
        with Locations(Location((50, 226, 0), (0, 0, 25.856016698))):
            Circle(SKETCH14_R)
    extrude(amount=-CUT_EXTRUDE9_DEPTH, mode=Mode.SUBTRACT)


with BuildPart() as body_2:
    # Sketch13 → Boss-Extrude7 (new body)
    with BuildSketch(Plane(origin=(0, 0, -100), x_dir=(-1, 0, 0), z_dir=(0, 0, -1))):
        Polygon((-25, -125), (-25, -155), (25.018802851, -155), (25, -125), align=None)
    extrude(amount=BOSS_EXTRUDE7_DEPTH)

    # Fillet4
    # the kernel refuses this fillet: 10 mm, written as the material it takes off along each edge
    with BuildSketch(Plane(origin=(-25.021013242, -158.526683302, -100.1), x_dir=(0, 0, 1), z_dir=(0.000626761593063201, 0.9999998035849335, 0))) as fillet4_piece_1:
        with BuildLine():
            CenterArc((10, 1.410673598), FILLET4_R, 180, 8.109614456)
            Line((0, 1.410673598), (0, 0))
            Line((0, 0), (0.1, 0))
        make_face()
    extrude(amount=37.053373882, mode=Mode.SUBTRACT)
    with BuildSketch(Plane(origin=(25, -121.473316005, -100.1), x_dir=(0, 0, 1), z_dir=(0, -1, 0))) as fillet4_piece_2:
        with BuildLine():
            CenterArc((10, 1.410673598), FILLET4_R, 180, 8.109614456)
            Line((0, 1.410673598), (0, 0))
            Line((0, 0), (0.1, 0))
        make_face()
    extrude(amount=37.05336799, mode=Mode.SUBTRACT)
    with BuildSketch(Plane(origin=(28.526683995, -155, -100.1), x_dir=(0, 0, 1), z_dir=(-1, 0, 0))) as fillet4_piece_3:
        with BuildLine():
            CenterArc((10, 1.410673598), FILLET4_R, 180, 8.109614456)
            Line((0, 1.410673598), (0, 0))
            Line((0, 0), (0.1, 0))
        make_face()
    extrude(amount=57.072170841, mode=Mode.SUBTRACT)


solid = Compound([part.part, body_2.part])
